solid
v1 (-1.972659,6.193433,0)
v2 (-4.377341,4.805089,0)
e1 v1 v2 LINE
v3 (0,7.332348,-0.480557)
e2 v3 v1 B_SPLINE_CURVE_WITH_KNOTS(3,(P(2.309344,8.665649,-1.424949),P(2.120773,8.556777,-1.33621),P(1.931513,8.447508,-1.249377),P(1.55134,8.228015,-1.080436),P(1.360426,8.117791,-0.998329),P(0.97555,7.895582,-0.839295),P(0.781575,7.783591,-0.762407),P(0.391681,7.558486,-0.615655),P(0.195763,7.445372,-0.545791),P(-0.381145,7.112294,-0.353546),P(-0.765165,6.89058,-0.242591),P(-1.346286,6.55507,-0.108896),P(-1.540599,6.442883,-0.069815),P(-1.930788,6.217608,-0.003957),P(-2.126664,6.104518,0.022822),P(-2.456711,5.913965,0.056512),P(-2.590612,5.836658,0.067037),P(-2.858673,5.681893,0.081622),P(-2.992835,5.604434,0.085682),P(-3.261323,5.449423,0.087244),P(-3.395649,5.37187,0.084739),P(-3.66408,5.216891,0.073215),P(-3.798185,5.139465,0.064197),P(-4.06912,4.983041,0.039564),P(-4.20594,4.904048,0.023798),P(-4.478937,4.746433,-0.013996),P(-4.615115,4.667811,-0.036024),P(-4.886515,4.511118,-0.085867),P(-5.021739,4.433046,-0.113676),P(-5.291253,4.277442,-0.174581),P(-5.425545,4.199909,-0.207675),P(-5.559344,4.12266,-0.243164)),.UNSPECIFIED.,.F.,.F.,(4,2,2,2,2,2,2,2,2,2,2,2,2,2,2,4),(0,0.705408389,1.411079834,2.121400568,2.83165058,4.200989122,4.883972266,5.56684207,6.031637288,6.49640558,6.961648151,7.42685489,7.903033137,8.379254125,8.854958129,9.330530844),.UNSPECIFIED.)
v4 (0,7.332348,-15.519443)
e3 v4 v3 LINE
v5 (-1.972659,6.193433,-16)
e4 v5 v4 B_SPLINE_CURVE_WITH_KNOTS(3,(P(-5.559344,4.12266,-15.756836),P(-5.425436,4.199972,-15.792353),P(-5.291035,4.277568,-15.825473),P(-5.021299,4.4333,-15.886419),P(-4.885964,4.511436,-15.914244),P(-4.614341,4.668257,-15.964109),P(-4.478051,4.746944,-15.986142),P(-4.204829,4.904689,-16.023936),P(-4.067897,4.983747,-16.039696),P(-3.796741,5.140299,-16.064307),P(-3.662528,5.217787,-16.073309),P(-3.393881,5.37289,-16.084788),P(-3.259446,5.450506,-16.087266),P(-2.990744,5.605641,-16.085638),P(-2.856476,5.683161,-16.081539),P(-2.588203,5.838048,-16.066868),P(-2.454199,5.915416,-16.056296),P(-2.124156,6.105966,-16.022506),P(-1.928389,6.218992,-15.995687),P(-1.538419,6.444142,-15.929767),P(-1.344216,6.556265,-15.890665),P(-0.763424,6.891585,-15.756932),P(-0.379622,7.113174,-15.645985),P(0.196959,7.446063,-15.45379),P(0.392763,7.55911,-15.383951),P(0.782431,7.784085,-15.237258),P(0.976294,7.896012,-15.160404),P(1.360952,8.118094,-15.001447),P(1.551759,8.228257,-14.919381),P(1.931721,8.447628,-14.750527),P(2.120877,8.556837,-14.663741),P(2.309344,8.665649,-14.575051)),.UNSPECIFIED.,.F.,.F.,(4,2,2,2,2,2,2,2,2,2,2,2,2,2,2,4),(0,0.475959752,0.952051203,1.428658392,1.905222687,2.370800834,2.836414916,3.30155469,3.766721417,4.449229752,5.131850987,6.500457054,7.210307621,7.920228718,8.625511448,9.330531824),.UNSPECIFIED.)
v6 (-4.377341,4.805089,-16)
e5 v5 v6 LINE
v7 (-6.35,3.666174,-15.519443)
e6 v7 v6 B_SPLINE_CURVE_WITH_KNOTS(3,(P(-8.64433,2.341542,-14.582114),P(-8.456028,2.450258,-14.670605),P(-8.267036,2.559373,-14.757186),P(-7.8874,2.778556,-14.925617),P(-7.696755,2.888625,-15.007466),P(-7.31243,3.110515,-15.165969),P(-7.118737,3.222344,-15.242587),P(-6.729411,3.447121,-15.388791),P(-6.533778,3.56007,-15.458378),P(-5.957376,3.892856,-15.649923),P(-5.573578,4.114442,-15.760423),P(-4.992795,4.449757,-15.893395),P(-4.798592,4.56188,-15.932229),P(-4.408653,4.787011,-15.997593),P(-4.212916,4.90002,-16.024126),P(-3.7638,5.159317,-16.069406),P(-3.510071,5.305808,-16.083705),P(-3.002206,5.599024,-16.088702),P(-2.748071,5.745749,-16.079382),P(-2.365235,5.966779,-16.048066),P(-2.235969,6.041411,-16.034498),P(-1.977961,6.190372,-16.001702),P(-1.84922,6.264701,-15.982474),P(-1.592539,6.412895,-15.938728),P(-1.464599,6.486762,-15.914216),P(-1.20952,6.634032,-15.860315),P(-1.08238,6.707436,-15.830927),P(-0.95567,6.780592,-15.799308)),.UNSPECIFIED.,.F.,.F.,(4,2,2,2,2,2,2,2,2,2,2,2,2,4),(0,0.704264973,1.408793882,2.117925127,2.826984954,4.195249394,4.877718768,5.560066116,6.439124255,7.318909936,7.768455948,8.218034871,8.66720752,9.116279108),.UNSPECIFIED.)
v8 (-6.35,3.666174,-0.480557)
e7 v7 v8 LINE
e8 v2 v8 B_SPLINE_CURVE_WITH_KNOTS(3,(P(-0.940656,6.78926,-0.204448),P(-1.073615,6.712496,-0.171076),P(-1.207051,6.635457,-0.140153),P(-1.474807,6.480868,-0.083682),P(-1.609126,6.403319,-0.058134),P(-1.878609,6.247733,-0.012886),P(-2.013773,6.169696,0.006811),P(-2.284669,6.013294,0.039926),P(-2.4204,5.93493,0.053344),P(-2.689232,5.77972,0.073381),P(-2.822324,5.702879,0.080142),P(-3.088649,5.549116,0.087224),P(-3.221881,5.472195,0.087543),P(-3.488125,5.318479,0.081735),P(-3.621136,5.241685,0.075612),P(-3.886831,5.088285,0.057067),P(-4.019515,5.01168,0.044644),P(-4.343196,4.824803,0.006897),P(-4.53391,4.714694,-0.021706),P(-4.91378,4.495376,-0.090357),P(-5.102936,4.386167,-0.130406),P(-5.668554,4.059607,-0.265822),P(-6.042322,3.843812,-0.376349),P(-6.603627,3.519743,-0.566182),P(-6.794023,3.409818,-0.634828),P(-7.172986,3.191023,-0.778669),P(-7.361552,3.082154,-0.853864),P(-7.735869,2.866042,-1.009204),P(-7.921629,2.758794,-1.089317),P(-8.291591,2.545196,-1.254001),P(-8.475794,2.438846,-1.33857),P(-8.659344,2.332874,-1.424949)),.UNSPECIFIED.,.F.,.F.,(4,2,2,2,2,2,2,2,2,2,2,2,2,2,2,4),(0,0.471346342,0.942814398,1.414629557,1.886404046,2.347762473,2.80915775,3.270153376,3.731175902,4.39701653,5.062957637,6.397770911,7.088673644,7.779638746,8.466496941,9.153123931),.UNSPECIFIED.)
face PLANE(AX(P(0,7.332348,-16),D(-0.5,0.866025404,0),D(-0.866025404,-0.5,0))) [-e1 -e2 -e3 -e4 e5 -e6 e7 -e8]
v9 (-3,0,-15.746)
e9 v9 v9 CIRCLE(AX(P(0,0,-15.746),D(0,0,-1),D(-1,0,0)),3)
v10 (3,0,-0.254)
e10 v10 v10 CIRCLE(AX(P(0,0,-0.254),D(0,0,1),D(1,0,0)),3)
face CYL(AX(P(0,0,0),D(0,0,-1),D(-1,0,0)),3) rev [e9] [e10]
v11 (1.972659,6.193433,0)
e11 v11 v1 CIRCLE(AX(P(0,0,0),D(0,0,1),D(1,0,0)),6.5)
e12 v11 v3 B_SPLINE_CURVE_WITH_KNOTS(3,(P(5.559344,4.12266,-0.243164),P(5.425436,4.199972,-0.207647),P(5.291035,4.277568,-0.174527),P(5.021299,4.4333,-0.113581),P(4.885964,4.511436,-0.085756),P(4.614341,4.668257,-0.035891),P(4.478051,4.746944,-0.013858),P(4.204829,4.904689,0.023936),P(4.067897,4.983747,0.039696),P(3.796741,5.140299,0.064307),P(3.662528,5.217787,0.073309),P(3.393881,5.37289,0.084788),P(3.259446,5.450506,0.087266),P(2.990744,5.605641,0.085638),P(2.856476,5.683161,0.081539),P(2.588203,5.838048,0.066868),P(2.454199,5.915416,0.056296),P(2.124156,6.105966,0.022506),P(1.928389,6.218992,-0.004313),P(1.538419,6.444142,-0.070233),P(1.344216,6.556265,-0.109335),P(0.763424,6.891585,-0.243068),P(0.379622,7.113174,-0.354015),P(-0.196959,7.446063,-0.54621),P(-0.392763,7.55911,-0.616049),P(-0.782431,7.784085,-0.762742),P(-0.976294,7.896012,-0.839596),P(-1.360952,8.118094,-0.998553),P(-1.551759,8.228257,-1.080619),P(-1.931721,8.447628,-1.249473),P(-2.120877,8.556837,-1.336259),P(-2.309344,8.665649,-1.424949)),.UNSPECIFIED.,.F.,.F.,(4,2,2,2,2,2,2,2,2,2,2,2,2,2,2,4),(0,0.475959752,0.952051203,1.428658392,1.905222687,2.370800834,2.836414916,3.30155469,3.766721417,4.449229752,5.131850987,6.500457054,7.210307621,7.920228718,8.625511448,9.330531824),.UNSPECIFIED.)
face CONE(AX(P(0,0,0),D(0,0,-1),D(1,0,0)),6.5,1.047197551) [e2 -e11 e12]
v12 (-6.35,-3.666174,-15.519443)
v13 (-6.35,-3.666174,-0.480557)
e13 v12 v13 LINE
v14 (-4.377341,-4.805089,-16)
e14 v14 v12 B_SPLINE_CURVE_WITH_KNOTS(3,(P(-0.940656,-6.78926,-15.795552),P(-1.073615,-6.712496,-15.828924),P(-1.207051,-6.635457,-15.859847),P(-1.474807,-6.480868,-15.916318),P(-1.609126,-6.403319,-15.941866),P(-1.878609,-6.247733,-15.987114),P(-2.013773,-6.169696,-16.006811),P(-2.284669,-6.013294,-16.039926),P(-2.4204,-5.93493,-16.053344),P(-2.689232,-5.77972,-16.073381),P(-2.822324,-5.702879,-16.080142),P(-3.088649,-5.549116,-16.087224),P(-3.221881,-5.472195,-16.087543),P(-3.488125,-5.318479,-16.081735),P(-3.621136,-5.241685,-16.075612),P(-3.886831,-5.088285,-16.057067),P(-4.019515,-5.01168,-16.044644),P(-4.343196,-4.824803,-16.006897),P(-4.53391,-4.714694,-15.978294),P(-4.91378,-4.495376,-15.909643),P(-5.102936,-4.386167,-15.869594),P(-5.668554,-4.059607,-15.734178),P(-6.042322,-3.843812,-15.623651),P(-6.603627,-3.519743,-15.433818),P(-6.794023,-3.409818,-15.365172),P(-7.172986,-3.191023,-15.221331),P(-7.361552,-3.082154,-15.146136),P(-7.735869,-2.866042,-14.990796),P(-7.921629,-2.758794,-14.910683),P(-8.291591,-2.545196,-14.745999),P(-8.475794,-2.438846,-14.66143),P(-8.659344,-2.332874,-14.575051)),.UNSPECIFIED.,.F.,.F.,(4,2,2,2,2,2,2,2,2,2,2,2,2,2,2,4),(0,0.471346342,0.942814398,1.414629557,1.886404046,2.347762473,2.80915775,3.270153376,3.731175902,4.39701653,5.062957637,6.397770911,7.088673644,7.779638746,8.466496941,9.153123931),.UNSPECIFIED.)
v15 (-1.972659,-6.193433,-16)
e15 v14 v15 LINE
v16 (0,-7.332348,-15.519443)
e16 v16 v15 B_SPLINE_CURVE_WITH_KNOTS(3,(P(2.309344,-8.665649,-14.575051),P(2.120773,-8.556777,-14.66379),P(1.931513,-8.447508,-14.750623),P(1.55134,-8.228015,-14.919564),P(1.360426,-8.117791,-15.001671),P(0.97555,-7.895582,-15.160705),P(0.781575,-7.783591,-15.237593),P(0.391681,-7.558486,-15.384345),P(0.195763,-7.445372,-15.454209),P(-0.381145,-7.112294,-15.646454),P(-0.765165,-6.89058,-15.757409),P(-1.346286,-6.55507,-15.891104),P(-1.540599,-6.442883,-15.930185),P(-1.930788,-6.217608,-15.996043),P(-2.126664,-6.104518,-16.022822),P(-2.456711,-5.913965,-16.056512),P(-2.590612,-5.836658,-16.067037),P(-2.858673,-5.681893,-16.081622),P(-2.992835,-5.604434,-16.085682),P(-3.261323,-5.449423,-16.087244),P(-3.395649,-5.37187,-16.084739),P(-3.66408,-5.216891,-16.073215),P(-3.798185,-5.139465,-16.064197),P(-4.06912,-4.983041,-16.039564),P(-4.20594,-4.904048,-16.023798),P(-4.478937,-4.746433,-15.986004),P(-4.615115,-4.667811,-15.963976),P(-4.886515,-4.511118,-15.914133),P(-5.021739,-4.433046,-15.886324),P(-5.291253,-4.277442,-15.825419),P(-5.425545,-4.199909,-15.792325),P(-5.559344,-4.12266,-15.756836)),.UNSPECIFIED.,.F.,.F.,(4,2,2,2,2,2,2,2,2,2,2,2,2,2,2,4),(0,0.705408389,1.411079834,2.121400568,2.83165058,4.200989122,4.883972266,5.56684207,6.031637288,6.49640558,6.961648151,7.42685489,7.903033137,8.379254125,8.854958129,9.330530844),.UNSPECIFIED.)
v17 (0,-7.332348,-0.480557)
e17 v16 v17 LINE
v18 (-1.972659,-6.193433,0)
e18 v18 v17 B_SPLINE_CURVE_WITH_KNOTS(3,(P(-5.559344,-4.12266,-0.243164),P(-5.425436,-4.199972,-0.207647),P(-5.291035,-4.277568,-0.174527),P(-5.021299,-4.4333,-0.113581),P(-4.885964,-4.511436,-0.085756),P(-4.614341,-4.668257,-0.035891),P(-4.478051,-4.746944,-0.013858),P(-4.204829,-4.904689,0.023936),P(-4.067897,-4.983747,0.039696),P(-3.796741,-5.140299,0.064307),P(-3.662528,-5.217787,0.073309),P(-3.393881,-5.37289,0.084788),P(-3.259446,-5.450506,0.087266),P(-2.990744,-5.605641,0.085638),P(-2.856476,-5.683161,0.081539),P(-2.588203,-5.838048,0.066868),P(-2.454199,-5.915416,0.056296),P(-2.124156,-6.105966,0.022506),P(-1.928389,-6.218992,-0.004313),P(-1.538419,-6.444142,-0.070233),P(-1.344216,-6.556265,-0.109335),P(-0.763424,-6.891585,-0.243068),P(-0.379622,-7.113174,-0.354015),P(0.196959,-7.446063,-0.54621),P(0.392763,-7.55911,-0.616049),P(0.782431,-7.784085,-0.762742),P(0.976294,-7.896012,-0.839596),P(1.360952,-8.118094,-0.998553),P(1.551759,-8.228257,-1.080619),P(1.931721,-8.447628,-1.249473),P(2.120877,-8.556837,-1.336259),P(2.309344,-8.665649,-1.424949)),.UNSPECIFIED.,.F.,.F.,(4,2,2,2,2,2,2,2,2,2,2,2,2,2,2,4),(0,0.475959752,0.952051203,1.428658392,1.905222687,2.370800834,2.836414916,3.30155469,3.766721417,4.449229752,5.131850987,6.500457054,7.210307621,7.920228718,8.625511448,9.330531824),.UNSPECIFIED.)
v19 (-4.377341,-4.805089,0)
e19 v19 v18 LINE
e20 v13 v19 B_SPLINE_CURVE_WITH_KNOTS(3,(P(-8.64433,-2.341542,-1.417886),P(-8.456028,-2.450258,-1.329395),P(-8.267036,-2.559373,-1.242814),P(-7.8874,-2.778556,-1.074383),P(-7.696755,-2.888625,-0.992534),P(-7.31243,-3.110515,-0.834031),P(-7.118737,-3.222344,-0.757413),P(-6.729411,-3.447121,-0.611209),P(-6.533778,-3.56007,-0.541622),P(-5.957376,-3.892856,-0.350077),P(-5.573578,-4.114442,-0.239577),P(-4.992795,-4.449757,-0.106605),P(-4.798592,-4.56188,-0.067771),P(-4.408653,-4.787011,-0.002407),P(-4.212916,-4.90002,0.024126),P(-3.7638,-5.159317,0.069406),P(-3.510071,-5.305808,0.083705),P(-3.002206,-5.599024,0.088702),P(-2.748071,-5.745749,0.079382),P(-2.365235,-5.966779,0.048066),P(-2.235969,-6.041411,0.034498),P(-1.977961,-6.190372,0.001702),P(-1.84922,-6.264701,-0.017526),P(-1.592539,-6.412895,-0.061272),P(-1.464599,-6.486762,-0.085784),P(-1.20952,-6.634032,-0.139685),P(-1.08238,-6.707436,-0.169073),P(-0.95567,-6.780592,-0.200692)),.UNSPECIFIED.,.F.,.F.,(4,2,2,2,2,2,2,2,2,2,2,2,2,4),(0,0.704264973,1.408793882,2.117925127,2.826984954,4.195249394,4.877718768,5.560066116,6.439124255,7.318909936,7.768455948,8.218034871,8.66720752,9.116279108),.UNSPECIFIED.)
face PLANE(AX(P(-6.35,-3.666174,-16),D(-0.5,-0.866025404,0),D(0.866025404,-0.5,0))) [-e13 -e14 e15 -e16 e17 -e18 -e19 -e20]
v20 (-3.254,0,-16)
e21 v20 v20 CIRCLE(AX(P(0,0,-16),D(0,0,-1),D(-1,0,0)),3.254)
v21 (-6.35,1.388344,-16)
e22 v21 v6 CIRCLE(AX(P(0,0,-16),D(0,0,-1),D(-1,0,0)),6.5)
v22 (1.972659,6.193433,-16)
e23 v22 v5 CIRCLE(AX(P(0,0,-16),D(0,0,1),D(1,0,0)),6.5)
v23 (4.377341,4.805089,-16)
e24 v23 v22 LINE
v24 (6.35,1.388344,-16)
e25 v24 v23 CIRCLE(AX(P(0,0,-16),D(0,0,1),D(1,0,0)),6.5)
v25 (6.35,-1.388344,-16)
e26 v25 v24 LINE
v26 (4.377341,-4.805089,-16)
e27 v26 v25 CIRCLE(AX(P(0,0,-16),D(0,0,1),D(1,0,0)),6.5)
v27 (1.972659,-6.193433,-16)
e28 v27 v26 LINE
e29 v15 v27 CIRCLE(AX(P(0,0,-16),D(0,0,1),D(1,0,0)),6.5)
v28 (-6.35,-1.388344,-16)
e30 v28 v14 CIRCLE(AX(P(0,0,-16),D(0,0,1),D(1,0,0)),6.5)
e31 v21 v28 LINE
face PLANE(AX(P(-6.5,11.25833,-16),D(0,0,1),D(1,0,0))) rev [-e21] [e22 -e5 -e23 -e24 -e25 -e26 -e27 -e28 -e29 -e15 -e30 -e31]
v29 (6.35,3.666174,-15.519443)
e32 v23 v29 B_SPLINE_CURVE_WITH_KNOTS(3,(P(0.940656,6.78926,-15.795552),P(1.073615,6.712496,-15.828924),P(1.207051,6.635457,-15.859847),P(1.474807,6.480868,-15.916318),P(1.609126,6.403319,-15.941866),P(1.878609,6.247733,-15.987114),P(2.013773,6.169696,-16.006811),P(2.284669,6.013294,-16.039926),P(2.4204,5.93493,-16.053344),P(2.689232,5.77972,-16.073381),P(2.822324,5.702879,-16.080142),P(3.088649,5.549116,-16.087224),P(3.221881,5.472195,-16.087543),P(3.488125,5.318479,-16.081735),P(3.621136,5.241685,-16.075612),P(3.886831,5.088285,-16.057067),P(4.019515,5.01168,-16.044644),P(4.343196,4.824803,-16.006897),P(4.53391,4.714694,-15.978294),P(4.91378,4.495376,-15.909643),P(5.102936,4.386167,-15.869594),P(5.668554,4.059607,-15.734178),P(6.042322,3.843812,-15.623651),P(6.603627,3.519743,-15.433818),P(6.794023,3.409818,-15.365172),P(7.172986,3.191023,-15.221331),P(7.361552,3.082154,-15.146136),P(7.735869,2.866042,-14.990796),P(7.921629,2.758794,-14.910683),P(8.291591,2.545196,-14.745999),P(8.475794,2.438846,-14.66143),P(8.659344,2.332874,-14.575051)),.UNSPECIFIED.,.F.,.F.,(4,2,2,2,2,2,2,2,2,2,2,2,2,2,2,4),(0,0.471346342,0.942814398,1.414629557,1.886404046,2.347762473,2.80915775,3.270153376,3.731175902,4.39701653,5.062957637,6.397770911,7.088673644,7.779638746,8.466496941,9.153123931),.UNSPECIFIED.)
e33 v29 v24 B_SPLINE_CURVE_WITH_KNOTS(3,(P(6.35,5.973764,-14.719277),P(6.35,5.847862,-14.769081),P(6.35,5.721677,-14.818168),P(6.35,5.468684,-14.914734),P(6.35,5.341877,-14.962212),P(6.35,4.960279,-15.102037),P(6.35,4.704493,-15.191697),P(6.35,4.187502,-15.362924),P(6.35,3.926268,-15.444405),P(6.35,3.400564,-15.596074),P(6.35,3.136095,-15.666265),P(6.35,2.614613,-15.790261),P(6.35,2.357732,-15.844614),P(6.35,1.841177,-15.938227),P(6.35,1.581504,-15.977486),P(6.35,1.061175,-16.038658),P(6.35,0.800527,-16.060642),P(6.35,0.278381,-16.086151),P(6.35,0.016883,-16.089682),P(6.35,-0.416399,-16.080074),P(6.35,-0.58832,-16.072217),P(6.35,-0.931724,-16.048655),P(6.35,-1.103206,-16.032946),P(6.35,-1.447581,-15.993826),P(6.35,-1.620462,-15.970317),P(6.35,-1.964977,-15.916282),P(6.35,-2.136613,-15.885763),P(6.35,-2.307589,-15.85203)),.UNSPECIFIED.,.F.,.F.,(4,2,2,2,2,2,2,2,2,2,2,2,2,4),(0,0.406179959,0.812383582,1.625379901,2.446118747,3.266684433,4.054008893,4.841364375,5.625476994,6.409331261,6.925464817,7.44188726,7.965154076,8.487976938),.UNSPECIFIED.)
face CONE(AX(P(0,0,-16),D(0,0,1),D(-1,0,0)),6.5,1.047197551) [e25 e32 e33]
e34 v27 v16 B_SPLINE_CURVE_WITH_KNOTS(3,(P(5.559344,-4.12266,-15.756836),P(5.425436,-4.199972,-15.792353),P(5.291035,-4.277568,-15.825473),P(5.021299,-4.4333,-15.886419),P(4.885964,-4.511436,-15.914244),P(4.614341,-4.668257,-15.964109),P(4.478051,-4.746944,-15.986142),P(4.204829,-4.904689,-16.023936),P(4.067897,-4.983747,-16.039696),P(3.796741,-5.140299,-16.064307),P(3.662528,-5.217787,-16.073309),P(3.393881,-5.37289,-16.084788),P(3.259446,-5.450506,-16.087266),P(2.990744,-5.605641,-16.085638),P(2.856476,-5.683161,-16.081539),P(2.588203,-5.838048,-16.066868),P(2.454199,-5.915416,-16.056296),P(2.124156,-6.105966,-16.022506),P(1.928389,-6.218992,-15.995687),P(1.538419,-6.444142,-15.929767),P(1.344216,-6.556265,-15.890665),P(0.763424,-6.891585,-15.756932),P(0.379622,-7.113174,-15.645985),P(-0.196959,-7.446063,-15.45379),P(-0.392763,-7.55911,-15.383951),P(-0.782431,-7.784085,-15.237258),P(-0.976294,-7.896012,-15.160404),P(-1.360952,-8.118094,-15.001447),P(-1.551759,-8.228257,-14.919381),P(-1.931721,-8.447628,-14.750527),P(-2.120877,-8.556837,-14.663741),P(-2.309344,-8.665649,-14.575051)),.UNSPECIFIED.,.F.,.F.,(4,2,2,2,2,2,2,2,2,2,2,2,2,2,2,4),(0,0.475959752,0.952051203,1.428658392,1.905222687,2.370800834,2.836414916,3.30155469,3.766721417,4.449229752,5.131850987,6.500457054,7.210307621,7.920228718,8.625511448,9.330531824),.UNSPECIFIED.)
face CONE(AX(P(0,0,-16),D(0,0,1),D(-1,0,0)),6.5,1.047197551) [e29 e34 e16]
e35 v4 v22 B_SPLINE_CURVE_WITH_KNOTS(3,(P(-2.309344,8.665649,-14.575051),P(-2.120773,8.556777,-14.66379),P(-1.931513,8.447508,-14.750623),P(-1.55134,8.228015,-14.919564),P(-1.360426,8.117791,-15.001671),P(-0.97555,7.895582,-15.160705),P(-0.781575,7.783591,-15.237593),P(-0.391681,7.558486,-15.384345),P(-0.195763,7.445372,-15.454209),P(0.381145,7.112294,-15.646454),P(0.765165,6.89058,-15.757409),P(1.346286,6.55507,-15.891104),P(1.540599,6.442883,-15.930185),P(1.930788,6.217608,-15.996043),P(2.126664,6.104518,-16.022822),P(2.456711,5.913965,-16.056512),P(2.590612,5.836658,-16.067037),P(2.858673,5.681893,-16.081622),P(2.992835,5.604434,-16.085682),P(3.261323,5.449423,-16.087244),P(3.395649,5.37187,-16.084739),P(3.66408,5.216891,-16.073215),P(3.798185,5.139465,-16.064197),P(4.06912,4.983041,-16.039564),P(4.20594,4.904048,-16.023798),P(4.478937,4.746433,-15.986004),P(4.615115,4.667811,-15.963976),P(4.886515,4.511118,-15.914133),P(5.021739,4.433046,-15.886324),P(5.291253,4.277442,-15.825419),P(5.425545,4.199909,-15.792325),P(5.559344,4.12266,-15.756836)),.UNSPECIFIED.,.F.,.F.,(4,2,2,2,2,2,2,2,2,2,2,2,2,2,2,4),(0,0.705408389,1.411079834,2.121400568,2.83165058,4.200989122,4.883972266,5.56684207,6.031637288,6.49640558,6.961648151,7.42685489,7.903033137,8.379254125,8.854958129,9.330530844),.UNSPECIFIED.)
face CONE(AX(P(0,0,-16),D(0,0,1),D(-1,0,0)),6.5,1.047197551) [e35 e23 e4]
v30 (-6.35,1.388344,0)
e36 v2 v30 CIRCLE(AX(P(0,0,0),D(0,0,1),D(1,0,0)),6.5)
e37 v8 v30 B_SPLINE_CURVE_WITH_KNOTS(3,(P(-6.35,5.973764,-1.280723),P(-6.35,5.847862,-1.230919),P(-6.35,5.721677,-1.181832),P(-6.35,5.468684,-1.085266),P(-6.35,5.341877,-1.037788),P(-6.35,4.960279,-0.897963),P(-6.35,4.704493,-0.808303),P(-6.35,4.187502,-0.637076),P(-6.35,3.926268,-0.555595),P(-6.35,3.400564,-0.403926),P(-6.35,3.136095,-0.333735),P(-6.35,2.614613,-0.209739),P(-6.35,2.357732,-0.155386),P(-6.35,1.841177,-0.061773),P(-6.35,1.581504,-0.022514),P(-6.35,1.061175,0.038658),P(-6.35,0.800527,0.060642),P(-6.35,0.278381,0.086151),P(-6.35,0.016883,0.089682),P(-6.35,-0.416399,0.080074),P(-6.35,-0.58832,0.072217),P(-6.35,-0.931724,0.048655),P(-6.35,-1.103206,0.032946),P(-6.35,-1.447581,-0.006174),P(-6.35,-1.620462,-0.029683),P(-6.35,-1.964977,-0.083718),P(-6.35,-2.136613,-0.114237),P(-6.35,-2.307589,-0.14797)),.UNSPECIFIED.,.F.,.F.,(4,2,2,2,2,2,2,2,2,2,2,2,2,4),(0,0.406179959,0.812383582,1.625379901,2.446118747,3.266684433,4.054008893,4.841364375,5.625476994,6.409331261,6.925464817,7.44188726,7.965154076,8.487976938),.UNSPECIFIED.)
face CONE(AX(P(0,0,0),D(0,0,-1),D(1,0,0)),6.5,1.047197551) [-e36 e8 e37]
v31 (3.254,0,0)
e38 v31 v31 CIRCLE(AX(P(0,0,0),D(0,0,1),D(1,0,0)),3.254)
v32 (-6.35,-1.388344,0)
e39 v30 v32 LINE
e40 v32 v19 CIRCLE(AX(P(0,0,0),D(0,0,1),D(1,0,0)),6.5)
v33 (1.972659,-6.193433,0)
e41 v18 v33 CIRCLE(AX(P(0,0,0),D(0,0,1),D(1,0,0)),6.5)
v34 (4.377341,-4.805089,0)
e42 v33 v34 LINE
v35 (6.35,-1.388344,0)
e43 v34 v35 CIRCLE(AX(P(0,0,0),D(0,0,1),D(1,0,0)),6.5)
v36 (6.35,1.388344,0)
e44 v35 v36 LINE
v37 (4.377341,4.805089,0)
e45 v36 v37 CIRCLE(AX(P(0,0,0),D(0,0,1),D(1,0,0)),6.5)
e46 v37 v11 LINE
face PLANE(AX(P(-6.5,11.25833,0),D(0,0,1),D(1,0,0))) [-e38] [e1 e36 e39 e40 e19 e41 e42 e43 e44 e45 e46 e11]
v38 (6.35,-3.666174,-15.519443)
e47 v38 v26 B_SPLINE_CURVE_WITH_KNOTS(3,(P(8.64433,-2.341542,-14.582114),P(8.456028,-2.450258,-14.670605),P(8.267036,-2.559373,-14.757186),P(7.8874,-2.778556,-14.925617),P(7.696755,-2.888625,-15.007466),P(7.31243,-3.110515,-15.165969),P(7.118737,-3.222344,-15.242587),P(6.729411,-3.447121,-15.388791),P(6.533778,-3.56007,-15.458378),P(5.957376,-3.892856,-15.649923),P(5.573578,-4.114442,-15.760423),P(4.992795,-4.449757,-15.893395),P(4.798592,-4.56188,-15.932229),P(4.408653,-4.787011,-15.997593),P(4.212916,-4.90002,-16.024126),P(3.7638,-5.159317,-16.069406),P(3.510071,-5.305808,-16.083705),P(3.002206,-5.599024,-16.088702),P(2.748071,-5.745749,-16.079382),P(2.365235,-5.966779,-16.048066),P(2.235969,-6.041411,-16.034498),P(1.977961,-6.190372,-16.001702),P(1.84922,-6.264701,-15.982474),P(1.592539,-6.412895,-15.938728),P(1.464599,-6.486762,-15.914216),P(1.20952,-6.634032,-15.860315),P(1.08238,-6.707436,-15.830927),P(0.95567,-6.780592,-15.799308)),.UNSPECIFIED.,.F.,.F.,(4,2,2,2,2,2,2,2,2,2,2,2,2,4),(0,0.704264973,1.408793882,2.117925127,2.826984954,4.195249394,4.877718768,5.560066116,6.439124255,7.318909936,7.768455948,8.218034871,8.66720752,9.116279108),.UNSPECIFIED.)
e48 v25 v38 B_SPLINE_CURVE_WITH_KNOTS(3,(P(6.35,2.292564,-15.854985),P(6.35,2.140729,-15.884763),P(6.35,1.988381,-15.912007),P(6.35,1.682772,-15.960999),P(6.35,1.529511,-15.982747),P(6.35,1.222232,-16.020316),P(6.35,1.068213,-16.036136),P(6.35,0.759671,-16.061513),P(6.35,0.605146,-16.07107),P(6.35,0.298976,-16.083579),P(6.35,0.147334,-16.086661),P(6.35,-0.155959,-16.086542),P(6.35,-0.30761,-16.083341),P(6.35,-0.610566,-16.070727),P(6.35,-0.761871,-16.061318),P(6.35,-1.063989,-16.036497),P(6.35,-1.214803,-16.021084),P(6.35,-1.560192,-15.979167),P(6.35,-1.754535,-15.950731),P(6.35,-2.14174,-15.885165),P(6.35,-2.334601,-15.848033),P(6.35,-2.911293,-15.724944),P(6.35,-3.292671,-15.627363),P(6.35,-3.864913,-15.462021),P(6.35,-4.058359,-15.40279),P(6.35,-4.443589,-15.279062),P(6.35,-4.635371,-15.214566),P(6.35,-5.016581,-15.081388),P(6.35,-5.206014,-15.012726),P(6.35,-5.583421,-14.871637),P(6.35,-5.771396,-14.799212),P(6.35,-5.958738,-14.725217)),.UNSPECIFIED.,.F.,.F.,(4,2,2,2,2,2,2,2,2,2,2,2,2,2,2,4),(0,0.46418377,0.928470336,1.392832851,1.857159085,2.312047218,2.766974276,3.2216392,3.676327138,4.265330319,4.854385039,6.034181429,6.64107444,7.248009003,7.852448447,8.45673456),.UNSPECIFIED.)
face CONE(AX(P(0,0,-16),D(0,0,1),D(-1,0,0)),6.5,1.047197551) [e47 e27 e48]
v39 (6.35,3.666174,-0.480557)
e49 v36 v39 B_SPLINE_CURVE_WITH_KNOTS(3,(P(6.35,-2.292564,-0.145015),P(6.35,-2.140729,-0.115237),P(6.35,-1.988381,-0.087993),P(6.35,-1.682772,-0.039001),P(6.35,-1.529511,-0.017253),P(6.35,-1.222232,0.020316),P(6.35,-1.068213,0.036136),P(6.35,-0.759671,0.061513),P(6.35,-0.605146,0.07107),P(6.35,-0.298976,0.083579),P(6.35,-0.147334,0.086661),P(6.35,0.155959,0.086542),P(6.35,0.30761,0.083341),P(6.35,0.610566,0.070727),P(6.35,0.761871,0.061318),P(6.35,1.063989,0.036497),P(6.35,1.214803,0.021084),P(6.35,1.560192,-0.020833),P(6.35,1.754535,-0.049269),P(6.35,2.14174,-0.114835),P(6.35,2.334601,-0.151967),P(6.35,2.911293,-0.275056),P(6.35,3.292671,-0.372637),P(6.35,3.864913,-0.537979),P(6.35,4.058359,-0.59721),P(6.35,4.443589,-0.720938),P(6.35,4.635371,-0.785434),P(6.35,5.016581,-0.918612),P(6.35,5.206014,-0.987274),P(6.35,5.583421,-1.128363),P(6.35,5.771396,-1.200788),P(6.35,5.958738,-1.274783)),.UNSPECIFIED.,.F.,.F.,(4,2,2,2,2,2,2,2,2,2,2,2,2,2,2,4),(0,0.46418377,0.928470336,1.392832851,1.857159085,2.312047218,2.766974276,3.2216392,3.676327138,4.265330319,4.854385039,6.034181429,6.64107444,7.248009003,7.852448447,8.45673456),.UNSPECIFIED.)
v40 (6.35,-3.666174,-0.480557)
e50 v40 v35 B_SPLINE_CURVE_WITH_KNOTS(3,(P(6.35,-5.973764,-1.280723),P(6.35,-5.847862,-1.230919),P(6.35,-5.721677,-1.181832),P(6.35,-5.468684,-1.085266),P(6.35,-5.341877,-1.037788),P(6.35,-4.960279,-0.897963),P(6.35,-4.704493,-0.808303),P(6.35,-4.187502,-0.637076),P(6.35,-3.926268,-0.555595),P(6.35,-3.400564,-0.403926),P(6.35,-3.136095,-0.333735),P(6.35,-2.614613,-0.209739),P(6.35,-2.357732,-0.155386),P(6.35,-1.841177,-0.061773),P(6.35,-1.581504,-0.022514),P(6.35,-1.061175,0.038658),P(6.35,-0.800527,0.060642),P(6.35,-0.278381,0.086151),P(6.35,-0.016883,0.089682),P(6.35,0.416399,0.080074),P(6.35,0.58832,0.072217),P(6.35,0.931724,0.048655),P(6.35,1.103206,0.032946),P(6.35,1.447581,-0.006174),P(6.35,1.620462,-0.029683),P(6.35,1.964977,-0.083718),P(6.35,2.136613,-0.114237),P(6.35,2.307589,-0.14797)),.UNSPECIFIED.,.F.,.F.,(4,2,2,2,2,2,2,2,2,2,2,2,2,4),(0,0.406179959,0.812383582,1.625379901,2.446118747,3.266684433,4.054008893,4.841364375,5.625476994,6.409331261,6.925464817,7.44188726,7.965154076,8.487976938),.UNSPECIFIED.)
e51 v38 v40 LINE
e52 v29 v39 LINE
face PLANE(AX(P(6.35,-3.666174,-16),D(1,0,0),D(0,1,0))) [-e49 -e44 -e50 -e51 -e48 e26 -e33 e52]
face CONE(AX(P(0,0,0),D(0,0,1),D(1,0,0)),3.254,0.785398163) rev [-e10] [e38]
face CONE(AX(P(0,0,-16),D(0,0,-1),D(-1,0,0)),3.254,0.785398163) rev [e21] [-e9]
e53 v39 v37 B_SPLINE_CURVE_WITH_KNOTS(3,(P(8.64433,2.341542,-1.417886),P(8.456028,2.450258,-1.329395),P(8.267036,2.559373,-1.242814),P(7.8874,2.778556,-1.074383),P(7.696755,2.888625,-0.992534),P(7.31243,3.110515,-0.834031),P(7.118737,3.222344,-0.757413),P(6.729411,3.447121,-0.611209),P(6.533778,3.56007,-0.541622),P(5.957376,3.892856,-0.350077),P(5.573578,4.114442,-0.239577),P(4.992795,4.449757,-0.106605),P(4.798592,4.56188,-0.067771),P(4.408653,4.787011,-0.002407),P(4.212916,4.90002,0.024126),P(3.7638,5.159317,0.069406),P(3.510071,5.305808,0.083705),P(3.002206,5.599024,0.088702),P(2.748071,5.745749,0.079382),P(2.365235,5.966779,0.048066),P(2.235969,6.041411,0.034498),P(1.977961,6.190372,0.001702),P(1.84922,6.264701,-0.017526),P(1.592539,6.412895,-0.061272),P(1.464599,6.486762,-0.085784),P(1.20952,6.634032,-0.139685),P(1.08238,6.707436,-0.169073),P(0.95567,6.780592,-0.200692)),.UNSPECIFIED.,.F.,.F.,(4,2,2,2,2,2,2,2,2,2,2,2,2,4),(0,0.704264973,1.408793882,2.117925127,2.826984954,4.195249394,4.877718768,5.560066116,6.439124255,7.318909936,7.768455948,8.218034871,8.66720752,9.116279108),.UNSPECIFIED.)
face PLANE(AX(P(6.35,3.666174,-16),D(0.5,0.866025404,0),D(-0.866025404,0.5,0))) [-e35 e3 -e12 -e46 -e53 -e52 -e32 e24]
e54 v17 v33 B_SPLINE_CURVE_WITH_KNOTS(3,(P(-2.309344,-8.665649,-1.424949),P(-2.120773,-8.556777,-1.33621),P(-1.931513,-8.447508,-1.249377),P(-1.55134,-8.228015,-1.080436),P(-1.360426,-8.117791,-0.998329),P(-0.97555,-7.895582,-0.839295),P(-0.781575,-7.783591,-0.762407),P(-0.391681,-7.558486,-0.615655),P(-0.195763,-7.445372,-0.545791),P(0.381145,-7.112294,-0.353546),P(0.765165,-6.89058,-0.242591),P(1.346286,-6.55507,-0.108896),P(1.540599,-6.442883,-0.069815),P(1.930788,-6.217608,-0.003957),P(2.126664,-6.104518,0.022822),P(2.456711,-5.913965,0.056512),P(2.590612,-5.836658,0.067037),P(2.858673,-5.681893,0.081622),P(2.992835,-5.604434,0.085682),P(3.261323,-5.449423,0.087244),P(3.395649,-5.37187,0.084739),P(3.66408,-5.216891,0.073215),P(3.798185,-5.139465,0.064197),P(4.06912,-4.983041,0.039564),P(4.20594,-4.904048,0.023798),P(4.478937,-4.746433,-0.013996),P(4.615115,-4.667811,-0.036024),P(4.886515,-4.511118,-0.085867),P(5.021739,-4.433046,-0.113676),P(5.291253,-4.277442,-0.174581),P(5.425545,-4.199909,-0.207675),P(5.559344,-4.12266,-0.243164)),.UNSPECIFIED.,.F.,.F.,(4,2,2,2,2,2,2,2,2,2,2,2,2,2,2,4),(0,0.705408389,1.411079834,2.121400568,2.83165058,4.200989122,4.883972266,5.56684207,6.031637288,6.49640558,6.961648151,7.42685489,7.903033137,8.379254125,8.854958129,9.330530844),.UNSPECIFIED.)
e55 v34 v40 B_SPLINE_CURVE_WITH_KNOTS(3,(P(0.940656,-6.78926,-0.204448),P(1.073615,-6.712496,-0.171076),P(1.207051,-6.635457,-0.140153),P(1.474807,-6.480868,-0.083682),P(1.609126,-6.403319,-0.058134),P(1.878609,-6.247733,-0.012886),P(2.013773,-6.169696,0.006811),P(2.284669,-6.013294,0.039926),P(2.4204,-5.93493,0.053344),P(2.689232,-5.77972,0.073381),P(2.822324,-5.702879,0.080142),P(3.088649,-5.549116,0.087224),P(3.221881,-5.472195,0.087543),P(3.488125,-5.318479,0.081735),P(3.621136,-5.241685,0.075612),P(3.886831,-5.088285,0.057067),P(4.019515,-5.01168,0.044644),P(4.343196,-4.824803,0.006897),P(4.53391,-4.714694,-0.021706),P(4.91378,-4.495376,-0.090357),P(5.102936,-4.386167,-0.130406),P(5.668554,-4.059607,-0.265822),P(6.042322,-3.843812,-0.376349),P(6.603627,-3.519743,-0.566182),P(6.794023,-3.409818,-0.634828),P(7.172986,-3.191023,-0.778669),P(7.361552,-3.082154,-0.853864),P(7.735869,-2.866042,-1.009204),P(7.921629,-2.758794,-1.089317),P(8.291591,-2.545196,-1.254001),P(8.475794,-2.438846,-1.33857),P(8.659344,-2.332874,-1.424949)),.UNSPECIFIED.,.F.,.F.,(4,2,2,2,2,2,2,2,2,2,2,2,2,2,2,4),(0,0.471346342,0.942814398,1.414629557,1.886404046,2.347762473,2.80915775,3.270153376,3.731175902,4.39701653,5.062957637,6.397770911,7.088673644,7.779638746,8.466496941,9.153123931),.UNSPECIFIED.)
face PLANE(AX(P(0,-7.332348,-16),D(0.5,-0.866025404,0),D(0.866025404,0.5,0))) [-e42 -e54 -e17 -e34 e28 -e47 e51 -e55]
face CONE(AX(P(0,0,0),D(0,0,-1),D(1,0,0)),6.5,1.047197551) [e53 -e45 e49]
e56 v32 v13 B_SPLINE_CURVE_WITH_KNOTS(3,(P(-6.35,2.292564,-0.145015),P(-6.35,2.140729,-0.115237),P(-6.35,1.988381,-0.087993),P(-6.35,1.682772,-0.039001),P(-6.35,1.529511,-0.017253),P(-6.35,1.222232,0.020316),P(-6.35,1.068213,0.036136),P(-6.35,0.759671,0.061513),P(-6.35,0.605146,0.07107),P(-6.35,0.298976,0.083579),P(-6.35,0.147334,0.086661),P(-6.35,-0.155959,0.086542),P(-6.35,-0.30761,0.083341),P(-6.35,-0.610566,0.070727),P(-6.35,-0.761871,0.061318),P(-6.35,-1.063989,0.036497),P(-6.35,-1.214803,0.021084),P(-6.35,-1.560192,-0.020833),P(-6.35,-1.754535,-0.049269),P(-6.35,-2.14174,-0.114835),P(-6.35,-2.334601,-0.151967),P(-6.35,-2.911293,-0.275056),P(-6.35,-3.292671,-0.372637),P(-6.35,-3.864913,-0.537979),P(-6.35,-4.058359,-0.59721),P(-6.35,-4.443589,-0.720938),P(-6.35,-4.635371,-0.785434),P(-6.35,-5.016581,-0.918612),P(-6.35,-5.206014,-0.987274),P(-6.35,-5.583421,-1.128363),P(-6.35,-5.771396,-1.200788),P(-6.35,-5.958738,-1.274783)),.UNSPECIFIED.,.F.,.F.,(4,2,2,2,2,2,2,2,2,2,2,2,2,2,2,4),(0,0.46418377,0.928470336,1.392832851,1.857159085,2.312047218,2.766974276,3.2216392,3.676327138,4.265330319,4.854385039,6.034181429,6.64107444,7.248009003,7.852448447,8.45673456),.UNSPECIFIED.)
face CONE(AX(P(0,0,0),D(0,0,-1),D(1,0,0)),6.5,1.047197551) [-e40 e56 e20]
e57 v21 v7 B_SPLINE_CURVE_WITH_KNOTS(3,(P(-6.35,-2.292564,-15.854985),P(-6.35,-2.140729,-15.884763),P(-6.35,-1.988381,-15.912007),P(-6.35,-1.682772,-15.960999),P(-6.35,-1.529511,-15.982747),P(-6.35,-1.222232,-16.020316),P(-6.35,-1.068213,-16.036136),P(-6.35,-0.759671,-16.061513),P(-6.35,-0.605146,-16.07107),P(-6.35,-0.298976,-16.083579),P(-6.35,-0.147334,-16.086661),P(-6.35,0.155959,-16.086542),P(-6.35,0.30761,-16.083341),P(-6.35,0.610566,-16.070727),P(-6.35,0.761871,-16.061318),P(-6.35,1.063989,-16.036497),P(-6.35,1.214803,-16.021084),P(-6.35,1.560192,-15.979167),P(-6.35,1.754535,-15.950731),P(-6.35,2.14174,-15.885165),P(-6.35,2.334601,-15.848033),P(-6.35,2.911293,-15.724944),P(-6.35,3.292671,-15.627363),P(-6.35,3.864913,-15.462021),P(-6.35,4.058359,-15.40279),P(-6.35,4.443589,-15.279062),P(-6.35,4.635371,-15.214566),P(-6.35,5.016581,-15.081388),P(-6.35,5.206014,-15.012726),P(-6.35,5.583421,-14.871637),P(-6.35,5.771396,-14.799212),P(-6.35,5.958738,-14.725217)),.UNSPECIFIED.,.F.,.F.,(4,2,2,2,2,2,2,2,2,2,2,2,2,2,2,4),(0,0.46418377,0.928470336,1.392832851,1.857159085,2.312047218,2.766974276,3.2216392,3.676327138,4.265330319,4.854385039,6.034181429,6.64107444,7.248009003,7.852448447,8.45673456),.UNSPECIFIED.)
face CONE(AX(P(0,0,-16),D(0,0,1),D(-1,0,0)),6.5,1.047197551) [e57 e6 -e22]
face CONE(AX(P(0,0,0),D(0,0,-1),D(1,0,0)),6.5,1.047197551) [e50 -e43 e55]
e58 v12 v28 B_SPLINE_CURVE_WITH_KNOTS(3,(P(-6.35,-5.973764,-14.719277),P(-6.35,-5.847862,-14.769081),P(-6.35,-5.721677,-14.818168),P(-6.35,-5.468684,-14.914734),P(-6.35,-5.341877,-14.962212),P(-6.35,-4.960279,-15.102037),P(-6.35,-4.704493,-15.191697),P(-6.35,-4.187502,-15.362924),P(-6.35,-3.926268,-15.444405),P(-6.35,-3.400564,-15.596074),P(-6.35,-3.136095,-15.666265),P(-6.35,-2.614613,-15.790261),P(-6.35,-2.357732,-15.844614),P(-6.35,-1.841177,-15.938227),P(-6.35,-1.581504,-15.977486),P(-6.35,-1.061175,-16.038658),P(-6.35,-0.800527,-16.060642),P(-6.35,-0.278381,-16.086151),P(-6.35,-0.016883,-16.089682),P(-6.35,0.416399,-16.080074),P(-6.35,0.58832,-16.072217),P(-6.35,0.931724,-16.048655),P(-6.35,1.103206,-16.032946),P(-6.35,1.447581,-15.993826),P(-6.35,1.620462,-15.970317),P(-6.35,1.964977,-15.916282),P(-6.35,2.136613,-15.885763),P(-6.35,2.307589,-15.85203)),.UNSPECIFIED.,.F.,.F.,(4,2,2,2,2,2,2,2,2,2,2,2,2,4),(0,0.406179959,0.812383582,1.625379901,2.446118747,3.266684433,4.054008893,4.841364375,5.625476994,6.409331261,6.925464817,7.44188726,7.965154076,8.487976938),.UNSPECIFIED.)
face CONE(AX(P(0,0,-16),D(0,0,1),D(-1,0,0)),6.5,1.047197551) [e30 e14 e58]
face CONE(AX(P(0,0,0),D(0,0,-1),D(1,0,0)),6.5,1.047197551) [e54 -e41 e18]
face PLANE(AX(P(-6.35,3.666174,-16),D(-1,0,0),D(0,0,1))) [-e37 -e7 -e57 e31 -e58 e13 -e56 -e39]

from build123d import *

# Parameters (mm, degrees)
EXTRUDE1_DEPTH     = 16
SKETCH2_OUTSIDE_W  = 88.794
SKETCH2_OUTSIDE_H  = 90.806
SKETCH2_OUTSIDE_R  = 6.5
CUT_EXTRUDE1_DEPTH = 19.83038325
CUT_EXTRUDE1_DRAFT = -60
SKETCH3_OUTSIDE_W  = 88.794
SKETCH3_OUTSIDE_H  = 90.806
SKETCH3_OUTSIDE_R  = 6.5
CUT_EXTRUDE2_DEPTH = 19.83038325
CUT_EXTRUDE2_DRAFT = -60
SKETCH4_R          = 3
CUT_EXTRUDE3_DEPTH = 19.83038325
SKETCH12_R         = 3
SKETCH12_R_2       = 2.350480947
EXTRUDE2_DEPTH     = 16
CUT_SWEEP1_PITCH   = 1
SKETCH13_R         = 3
CUT_EXTRUDE8_DEPTH = 19.830383335
SKETCH14_OUTSIDE_W = 20.1
SKETCH14_OUTSIDE_H = 22.112
CUT_EXTRUDE9_DEPTH = 19.830383335


with BuildPart() as part:
    # Sketch1 → Extrude1 (new body)
    with BuildSketch(Plane.XY):
        Polygon((0, 7.505553499), (-6.5, 3.75277675), (-6.5, -3.75277675), (0, -7.505553499), (6.5, -3.75277675), (6.5, 3.75277675), align=None)
    extrude(amount=-EXTRUDE1_DEPTH)


with BuildPart() as cut_extrude1_tool:
    # Sketch2 outside → Cut-Extrude1 (with draft: the straight prism first)
    with BuildSketch(Plane.XY):
        Rectangle(SKETCH2_OUTSIDE_W, SKETCH2_OUTSIDE_H)
        Circle(SKETCH2_OUTSIDE_R, mode=Mode.SUBTRACT)
    extrude(amount=-CUT_EXTRUDE1_DEPTH)
    # Cut-Extrude1: the draft: its side faces are tilted about the plane it starts from
    cut_extrude1_sides = [cut_extrude1_tool.faces().sort_by_distance(p)[0] for p in [
        (0, -45.403, -9.915191625),
        (44.397, 0, -9.915191625),
        (0, 45.403, -9.915191625),
        (-44.397, 0, -9.915191625),
        (-6.5, 0, -9.915191625),
    ]]
    draft(cut_extrude1_sides, Plane.XY, CUT_EXTRUDE1_DRAFT)


with BuildPart() as part_1:
    add(part.part)

    # Cut-Extrude1: cut by cut_extrude1_tool
    add(cut_extrude1_tool.part, mode=Mode.SUBTRACT)


with BuildPart() as cut_extrude2_tool:
    # Sketch3 outside → Cut-Extrude2 (with draft: the straight prism first)
    with BuildSketch(Plane(origin=(0, 0, -16), x_dir=(-1, 0, 0), z_dir=(0, 0, -1))):
        Rectangle(SKETCH3_OUTSIDE_W, SKETCH3_OUTSIDE_H)
        Circle(SKETCH3_OUTSIDE_R, mode=Mode.SUBTRACT)
    extrude(amount=-CUT_EXTRUDE2_DEPTH)
    # Cut-Extrude2: the draft: its side faces are tilted about the plane it starts from
    cut_extrude2_sides = [cut_extrude2_tool.faces().sort_by_distance(p)[0] for p in [
        (0, -45.403, -6.084808375),
        (-44.397, 0, -6.084808375),
        (0, 45.403, -6.084808375),
        (44.397, 0, -6.084808375),
        (6.5, 0, -6.084808375),
    ]]
    draft(cut_extrude2_sides, Plane(origin=(0, 0, -16), x_dir=(-1, 0, 0), z_dir=(0, 0, -1)), CUT_EXTRUDE2_DRAFT)


with BuildPart() as part_2:
    add(part_1.part)

    # Cut-Extrude2: cut by cut_extrude2_tool
    add(cut_extrude2_tool.part, mode=Mode.SUBTRACT)

    # Sketch4 → Cut-Extrude3 (cut, through all)
    with BuildSketch(Plane.XY):
        Circle(SKETCH4_R)
    extrude(amount=-CUT_EXTRUDE3_DEPTH, mode=Mode.SUBTRACT)

    # Sketch12 → Extrude2 (add)
    with BuildSketch(Plane.XY):
        Circle(SKETCH12_R)
        Circle(SKETCH12_R_2, mode=Mode.SUBTRACT)
    extrude(amount=-EXTRUDE2_DEPTH)

    # Cut-Sweep1: arcs per turn and ends read off the stored shape
    # Cut-Sweep1: the profile of Sketch9 profile screwed along a right-hand helix through 18 turns, 6 arcs to a turn; built about Z, then put on its axis
    cut_sweep1_z = Axis((0, 0, 0), (0, 0, 1))
    cut_sweep1_corners = [(3, 0, -0.5), (3, 0, -0.375), (2.350180947, 0, 0.000173205), (2.350180947, 0, -0.875173205)]
    with BuildLine(mode=Mode.PRIVATE) as cut_sweep1_profile:
        Line(cut_sweep1_corners[0], cut_sweep1_corners[1])
        Line(cut_sweep1_corners[1], cut_sweep1_corners[2])
        Line(cut_sweep1_corners[2], cut_sweep1_corners[3])
        Line(cut_sweep1_corners[3], cut_sweep1_corners[0])
    cut_sweep1_cap = Face(cut_sweep1_profile.wire())
    cut_sweep1_turn_angles = [0, 30, 60, 90, 120, 150, 180, 210, 240, 270, 300, 330, 360]
    cut_sweep1_turn_weights = [1, 0.8660254037844387, 1, 0.8660254037844387, 1, 0.8660254037844387, 1, 0.8660254037844387, 1, 0.8660254037844387, 1, 0.8660254037844387, 1]
    cut_sweep1_turn_rails = [Edge.make_bspline([Vector(p[0], p[1], 0).rotate(cut_sweep1_z, cut_sweep1_turn_angles[k]) / cut_sweep1_turn_weights[k] + Vector(0, 0, p[2] + CUT_SWEEP1_PITCH * cut_sweep1_turn_angles[k] / 360) for k in range(13)], [0, 0, 0, 1, 1, 2, 2, 3, 3, 4, 4, 5, 5, 6, 6, 6], 2, cut_sweep1_turn_weights) for p in cut_sweep1_corners]
    cut_sweep1_turn_sides = [Face.make_surface_from_curves(cut_sweep1_turn_rails[p[0]], cut_sweep1_turn_rails[p[1]]) for p in [(0, 1), (1, 2), (2, 3), (3, 0)]]
    cut_sweep1 = Plane(origin=(0, 0, 0), x_dir=(0, 1, 0), z_dir=(0, 0, -1)) * Solid(Shell([*[p.moved(Location((0, 0, CUT_SWEEP1_PITCH * i))) for i in range(18) for p in cut_sweep1_turn_sides], cut_sweep1_cap, cut_sweep1_cap.rotate(cut_sweep1_z, 6480).moved(Location((0, 0, CUT_SWEEP1_PITCH * 6480 / 360)))]))
    add(cut_sweep1, mode=Mode.SUBTRACT)

    # Cut-Extrude6 cone 1 section (through the dimple's axis) → Cut-Extrude6 (revolve, cut)
    with BuildSketch(Plane(origin=(0, 0, 0), x_dir=(0, -1, 0), z_dir=(1, 0, 0))):
        Polygon((0, 0), (3.254, 0), (0, 3.254), align=None)
    revolve(axis=Axis((0, 0, 0), (0, 0, -1)), mode=Mode.SUBTRACT)

    # Cut-Extrude7 cone 1 section (through the dimple's axis) → Cut-Extrude7 (revolve, cut)
    with BuildSketch(Plane(origin=(0, 0, -16), x_dir=(0, 1, 0), z_dir=(1, 0, 0))):
        Polygon((0, 0), (3.254, 0), (0, 3.254), align=None)
    revolve(axis=Axis((0, 0, -16), (0, 0, 1)), mode=Mode.SUBTRACT)

    # Sketch13 → Cut-Extrude8 (cut, through all)
    with BuildSketch(Plane.XY):
        with Locations(Location((0, 0, 0), (0, 0, 180))):
            Circle(SKETCH13_R)
    extrude(amount=-CUT_EXTRUDE8_DEPTH, mode=Mode.SUBTRACT)

    # Sketch14 outside → Cut-Extrude9 (cut, through all)
    with BuildSketch(Plane.XY):
        Rectangle(SKETCH14_OUTSIDE_W, SKETCH14_OUTSIDE_H)
        Polygon((0, 7.332348419), (-6.35, 3.666174209), (-6.35, -3.666174209), (0, -7.332348419), (6.35, -3.666174209), (6.35, 3.666174209), align=None, mode=Mode.SUBTRACT)
    extrude(amount=-CUT_EXTRUDE9_DEPTH, mode=Mode.SUBTRACT)


solid = part_2.part
